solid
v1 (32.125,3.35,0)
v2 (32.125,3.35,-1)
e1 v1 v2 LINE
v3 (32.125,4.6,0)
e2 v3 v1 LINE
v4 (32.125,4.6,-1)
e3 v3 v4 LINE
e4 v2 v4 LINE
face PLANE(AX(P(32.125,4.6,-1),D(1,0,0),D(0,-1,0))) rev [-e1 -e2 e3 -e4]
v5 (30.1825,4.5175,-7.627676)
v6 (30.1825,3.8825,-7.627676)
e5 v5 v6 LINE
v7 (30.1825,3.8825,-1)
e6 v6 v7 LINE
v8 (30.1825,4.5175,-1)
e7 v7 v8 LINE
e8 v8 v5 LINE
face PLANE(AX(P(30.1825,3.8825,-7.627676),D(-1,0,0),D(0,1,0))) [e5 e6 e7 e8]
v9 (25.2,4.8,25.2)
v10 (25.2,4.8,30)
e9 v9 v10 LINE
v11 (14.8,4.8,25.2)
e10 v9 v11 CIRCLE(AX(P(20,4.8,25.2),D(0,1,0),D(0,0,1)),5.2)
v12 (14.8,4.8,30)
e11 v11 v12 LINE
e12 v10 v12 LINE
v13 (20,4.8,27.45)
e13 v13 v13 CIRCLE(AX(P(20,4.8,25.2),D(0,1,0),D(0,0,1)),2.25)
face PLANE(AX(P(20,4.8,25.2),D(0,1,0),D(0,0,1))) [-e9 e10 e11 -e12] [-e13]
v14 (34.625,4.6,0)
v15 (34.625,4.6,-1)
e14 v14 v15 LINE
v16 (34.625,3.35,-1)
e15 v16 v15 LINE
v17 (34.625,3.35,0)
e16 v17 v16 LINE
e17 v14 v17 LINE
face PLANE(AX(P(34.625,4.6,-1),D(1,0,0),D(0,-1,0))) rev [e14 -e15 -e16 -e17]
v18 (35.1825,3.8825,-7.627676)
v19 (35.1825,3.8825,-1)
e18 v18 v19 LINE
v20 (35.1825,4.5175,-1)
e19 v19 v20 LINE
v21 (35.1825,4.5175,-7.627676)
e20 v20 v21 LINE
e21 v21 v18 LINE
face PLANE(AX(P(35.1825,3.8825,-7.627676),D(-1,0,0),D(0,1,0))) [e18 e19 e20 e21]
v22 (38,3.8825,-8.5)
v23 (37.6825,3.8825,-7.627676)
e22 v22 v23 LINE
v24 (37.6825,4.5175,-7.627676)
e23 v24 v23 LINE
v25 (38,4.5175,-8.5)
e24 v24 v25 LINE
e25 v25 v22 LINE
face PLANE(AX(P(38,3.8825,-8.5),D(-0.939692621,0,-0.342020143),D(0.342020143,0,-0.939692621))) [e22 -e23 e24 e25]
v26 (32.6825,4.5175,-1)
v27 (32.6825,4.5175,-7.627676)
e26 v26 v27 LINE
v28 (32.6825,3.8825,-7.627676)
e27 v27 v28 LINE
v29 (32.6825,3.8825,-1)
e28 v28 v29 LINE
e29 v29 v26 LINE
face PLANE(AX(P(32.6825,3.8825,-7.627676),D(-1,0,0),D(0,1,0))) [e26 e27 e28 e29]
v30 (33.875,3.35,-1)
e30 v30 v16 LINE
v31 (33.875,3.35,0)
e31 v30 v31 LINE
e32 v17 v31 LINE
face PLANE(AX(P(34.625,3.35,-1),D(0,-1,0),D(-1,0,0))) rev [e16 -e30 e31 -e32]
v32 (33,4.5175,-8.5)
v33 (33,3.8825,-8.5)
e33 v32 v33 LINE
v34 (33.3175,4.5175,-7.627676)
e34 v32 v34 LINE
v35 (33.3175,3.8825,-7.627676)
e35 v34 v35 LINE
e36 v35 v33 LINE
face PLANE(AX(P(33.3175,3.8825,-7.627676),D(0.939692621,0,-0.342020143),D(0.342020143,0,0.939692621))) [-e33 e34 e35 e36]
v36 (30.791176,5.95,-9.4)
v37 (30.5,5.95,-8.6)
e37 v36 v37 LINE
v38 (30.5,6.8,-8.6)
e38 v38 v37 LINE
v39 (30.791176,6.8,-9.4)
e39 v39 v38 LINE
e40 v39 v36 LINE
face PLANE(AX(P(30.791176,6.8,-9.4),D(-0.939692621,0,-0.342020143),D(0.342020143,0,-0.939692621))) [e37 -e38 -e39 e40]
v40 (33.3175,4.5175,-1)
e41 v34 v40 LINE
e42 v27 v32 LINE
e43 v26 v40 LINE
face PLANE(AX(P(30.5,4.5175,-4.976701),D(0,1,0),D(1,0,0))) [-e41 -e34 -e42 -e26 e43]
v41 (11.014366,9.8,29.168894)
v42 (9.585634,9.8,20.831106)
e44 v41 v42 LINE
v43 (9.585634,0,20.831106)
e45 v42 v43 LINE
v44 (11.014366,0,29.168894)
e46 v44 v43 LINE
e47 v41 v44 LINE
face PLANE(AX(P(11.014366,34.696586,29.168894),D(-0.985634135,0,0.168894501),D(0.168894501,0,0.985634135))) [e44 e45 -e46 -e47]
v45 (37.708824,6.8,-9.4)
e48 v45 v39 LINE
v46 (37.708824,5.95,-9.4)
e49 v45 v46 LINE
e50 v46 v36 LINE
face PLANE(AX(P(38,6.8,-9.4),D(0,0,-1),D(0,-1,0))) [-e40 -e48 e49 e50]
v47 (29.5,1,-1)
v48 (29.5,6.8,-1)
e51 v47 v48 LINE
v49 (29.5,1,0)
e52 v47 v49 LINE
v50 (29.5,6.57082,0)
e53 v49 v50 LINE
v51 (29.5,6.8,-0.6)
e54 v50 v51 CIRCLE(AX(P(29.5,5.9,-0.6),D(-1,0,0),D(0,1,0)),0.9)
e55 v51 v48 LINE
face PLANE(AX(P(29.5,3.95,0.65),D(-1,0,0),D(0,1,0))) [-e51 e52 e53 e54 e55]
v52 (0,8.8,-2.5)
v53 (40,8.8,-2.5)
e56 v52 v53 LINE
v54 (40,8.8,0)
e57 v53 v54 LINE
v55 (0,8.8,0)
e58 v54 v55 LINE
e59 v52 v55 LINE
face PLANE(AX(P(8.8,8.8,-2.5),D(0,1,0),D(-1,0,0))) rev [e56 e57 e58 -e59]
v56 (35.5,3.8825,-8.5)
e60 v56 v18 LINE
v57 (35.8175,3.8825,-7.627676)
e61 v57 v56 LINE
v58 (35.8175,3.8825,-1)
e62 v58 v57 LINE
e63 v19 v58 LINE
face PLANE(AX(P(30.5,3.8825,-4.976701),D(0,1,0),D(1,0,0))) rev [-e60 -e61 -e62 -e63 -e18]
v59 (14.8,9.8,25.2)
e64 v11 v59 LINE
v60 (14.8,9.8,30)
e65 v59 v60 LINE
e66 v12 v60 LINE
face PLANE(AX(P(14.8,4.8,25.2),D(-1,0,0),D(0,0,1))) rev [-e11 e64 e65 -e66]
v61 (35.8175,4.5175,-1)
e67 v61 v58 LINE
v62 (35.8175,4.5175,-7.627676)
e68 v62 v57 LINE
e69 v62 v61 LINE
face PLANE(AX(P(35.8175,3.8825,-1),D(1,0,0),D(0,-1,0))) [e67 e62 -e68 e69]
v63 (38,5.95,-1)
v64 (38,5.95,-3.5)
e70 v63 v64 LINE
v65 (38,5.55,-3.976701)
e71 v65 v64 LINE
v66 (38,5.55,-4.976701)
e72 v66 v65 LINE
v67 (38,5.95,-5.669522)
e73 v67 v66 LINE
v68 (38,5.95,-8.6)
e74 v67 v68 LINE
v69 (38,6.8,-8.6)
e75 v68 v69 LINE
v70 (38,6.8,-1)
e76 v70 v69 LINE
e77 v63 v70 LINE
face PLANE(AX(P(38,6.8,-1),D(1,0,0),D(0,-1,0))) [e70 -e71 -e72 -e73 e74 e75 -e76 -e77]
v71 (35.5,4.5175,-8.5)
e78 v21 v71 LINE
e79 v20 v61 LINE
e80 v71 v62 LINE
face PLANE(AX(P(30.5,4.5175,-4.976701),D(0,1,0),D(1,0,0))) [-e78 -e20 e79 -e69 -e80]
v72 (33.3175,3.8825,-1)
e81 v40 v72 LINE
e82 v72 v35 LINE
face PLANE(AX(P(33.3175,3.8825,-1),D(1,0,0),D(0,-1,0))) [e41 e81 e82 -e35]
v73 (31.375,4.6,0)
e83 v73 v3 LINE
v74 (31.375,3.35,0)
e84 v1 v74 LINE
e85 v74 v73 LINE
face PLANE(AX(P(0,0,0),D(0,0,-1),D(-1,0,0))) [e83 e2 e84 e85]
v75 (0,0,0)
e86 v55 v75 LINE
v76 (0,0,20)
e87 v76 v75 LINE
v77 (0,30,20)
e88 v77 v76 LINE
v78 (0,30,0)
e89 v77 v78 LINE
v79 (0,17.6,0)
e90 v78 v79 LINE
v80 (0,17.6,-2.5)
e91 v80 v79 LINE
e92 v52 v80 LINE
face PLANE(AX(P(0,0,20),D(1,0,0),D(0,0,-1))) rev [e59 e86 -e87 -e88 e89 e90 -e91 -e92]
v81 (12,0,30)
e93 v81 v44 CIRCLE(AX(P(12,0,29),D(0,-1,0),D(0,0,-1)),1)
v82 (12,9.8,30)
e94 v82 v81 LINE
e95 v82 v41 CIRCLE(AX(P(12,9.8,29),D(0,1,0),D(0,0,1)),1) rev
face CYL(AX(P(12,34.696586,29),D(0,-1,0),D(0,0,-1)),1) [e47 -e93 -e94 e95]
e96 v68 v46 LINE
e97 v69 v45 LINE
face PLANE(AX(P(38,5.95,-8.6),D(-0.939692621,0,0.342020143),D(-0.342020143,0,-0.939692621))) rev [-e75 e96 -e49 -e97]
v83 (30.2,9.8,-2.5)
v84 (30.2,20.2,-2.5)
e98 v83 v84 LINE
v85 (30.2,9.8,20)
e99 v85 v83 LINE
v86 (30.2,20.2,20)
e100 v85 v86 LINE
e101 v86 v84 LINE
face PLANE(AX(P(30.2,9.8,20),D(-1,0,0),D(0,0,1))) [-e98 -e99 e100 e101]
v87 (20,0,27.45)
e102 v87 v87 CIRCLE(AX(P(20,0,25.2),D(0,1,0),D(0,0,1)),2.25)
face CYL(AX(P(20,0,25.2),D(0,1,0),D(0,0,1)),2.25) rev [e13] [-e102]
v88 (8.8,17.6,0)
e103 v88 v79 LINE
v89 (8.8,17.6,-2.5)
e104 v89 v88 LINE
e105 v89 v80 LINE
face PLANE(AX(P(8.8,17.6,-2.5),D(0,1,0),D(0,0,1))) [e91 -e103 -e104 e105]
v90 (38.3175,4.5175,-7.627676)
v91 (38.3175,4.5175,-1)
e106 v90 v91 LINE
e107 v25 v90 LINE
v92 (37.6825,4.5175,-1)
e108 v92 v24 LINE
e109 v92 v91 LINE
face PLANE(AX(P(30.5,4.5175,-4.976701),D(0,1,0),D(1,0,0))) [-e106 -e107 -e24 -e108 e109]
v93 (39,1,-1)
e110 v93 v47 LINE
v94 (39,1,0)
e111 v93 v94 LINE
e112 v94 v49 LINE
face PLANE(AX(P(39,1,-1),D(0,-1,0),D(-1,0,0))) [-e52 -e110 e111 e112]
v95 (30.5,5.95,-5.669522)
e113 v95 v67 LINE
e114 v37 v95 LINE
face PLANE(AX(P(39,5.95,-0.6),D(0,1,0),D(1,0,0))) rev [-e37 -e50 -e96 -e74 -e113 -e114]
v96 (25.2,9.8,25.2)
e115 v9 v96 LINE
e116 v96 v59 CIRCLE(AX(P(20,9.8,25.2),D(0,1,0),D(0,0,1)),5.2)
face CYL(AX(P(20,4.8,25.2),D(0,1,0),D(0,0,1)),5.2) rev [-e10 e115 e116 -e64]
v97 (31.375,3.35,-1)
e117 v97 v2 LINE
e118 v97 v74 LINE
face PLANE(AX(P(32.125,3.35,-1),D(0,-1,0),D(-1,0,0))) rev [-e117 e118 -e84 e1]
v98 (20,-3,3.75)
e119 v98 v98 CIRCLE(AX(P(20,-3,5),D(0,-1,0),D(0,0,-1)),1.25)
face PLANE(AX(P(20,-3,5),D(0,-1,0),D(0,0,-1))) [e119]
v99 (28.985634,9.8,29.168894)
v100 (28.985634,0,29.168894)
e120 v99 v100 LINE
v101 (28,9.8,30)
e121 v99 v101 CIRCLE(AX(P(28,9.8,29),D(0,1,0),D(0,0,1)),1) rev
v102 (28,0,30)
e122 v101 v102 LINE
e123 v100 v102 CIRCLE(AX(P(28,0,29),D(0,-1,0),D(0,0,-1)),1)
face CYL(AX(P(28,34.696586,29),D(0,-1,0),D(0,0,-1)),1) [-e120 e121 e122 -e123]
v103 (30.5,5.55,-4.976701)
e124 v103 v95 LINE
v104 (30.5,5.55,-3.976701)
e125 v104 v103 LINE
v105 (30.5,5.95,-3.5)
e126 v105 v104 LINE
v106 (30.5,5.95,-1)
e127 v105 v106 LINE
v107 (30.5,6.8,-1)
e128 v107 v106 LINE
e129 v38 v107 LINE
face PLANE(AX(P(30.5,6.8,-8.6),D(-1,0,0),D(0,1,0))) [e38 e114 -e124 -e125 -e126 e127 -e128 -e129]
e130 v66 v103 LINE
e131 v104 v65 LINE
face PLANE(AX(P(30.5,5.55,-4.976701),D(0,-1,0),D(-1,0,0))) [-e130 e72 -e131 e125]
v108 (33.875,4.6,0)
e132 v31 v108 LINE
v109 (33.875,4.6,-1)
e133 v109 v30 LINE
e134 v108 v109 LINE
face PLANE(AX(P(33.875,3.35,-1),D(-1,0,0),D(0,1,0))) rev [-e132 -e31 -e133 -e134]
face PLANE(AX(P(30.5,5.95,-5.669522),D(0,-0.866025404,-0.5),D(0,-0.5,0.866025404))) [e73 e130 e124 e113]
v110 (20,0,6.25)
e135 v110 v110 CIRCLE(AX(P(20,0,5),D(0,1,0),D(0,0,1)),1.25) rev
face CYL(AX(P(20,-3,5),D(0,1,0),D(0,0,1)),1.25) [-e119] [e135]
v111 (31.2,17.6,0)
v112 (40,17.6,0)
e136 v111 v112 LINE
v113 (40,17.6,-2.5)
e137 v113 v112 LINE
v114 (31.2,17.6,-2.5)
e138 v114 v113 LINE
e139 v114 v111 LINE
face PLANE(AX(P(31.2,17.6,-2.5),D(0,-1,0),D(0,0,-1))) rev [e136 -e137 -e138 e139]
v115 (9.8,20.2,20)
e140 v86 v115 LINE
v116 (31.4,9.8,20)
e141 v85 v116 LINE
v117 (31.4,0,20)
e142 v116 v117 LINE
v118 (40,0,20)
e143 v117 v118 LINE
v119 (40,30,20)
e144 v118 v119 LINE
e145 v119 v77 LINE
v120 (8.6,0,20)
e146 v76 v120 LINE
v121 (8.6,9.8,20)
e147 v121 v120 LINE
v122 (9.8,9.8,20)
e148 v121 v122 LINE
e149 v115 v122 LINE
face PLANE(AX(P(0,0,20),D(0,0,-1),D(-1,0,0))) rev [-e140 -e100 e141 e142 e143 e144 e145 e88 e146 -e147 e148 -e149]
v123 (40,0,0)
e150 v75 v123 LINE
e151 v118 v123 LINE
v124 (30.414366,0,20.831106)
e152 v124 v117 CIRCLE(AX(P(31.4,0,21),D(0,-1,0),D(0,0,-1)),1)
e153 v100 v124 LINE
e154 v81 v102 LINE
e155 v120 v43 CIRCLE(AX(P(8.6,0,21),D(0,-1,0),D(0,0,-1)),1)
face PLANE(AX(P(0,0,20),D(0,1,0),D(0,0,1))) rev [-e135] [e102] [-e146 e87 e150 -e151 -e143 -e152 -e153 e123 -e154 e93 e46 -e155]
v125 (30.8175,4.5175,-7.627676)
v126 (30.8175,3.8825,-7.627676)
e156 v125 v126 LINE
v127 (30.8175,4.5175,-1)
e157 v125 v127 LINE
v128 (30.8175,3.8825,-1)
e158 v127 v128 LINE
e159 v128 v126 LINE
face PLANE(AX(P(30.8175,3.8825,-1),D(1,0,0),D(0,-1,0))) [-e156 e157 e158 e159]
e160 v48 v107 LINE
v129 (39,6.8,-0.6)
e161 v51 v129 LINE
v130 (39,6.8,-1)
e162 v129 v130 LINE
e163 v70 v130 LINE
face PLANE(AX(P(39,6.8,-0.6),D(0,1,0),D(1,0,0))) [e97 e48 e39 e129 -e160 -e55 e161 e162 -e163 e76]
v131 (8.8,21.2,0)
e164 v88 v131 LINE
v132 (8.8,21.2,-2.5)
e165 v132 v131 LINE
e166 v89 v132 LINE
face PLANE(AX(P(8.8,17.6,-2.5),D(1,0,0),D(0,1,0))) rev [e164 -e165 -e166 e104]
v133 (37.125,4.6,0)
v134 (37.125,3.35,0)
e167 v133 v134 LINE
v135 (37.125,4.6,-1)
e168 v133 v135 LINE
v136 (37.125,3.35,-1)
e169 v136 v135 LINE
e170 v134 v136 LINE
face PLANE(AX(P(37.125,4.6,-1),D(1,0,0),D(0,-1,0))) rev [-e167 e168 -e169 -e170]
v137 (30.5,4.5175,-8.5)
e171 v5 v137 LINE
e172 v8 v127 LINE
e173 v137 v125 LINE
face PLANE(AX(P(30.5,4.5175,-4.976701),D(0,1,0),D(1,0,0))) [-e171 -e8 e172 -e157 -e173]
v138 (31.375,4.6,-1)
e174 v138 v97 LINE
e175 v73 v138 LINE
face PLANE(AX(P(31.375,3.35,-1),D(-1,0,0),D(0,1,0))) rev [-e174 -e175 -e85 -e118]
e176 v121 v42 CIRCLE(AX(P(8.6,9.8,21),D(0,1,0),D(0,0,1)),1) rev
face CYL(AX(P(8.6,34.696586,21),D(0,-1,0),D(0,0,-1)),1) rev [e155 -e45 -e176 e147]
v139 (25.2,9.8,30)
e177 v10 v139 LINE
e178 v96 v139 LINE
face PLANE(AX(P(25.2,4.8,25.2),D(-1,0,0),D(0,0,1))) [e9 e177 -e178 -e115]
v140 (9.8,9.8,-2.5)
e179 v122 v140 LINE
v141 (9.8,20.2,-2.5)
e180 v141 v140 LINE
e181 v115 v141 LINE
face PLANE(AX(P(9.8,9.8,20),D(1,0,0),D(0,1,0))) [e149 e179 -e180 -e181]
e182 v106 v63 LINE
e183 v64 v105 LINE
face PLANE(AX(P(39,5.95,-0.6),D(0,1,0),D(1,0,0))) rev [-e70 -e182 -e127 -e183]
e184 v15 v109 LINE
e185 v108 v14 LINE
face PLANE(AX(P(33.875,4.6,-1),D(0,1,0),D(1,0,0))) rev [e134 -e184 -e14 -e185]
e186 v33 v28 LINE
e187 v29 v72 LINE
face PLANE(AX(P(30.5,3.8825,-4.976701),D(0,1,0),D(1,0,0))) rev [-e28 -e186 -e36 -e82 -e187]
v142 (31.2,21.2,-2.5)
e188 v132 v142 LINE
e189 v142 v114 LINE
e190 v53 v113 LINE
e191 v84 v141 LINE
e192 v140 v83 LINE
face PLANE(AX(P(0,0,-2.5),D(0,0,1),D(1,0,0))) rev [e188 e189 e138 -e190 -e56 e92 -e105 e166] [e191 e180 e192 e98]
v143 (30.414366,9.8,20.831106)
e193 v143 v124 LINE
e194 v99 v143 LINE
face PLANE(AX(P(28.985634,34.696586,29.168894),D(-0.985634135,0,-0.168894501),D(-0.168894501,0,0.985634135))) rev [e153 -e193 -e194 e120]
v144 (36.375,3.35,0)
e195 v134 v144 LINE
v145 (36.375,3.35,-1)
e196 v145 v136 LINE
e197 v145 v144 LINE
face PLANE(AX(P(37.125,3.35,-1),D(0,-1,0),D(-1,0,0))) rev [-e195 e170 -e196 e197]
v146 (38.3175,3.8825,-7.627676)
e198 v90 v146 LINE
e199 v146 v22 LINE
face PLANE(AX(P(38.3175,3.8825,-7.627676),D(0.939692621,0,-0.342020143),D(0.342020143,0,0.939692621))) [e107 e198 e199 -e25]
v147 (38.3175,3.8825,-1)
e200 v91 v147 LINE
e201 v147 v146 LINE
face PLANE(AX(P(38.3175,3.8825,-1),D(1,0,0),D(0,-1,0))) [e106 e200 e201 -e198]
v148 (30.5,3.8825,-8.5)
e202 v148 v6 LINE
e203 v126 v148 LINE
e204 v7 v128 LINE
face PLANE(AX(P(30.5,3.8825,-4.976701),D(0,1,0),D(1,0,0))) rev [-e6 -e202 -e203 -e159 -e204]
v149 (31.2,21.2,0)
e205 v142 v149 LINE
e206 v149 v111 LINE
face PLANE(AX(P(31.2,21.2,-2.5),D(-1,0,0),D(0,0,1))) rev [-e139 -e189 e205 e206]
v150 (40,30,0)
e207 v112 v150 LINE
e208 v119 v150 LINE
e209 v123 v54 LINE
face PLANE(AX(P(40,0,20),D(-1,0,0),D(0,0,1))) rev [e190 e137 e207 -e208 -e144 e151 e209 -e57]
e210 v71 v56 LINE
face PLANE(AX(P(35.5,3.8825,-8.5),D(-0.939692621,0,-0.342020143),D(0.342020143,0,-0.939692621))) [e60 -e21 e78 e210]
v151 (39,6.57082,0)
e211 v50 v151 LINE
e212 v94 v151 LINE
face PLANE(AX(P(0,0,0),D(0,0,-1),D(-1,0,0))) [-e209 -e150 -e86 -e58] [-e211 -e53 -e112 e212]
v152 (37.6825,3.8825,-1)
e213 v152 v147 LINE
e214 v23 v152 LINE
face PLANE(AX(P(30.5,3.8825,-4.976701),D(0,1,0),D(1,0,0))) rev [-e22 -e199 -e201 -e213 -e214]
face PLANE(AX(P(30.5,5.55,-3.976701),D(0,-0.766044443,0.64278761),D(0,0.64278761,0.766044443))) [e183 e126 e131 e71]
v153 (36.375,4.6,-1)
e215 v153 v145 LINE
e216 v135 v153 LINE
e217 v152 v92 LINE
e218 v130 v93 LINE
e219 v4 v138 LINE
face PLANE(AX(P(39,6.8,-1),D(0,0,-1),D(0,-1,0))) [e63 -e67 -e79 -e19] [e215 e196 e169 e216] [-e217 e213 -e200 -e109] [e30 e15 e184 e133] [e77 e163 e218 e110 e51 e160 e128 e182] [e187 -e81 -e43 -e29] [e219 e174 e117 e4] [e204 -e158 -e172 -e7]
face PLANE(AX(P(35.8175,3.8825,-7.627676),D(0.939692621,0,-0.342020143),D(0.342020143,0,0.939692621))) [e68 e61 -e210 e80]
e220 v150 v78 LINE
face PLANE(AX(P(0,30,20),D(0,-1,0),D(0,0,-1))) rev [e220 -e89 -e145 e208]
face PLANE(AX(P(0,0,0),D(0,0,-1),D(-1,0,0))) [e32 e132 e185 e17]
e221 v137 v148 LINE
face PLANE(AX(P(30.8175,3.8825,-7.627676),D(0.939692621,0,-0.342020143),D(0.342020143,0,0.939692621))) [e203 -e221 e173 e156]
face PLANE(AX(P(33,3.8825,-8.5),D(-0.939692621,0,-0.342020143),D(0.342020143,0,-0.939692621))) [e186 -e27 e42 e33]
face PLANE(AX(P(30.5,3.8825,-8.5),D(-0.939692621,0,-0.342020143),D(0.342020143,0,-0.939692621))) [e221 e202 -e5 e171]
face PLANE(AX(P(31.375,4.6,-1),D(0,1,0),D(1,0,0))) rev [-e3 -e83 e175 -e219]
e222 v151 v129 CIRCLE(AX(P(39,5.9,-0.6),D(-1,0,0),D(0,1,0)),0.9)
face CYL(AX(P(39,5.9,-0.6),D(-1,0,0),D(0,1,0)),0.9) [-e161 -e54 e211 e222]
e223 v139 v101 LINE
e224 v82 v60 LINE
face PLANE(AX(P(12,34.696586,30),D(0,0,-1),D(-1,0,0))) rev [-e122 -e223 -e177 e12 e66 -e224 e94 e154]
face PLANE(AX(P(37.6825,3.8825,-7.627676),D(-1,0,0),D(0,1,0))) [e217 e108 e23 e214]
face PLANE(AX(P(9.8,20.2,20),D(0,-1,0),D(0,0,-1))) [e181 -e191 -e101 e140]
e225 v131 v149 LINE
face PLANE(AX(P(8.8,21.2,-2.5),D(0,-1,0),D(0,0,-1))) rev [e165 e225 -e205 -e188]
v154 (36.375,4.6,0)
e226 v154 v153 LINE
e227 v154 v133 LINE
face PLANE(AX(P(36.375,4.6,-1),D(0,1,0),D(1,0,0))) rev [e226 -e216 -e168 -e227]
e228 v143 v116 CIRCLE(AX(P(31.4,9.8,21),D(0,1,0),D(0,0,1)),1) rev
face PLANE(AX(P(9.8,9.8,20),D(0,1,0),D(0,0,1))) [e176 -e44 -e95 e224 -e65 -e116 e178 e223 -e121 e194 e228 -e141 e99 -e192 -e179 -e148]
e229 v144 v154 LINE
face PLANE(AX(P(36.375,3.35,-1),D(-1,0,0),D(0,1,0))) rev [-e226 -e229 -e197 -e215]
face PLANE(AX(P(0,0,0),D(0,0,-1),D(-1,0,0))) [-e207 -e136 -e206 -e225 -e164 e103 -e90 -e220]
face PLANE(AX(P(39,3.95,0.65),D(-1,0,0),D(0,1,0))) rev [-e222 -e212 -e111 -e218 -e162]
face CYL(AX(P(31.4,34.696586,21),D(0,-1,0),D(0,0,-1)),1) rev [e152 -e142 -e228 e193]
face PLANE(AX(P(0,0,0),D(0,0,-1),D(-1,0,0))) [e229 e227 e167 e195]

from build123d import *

# Parameters (mm, degrees)
SKETCH1_W                   = 40
SKETCH1_H                   = 30
SKETCH1_W_2                 = 20.4
SKETCH1_H_2                 = 10.4
BOSS_EXTRUDE1_DEPTH         = 20
BOSS_EXTRUDE2_DEPTH         = 9.8
CUT_EXTRUDE1_DEPTH          = 5
SKETCH4_R                   = 2.25
CUT_EXTRUDE2_DEPTH          = 56.991427915
SKETCH5_W                   = 8.8
SKETCH5_H                   = 8.8
SKETCH5_W_2                 = 20.4
SKETCH5_H_2                 = 10.4
BOSS_EXTRUDE3_DEPTH         = 2.5
SKETCH7_R                   = 1.25
BOSS_EXTRUDE4_DEPTH         = 3
BODY_MOVE_COPY6_START       = 1
BODY_MOVE_COPY6_DEPTH       = 4.9
BODY_MOVE_COPY6_START_2     = 5.95
BODY_MOVE_COPY6_2_DEPTH     = 0.85
BODY_MOVE_COPY6_START_3     = 3.8825
BODY_MOVE_COPY6_3_DEPTH     = 0.635
BODY_MOVE_COPY6_4_OUTLINE_W = 0.75
BODY_MOVE_COPY6_4_OUTLINE_H = 1
BODY_MOVE_COPY6_4_DEPTH     = 2.35
BODY_MOVE_COPY6_START_4     = 4.6
BODY_MOVE_COPY6_5_OUTLINE_W = 0.75
BODY_MOVE_COPY6_5_OUTLINE_H = 1
BODY_MOVE_COPY6_5_DEPTH     = 1.35
BODY_MOVE_COPY6_START_5     = 30.5
BODY_MOVE_COPY6_6_DEPTH     = 7.5
BODY_MOVE_COPY6_START_6     = 29.5
BODY_MOVE_COPY6_7_DEPTH     = 9.5


with BuildPart() as part:
    # Sketch1 → Boss-Extrude1 (new body)
    with BuildSketch(Plane.XY):
        with Locations((20, 15)):
            Rectangle(SKETCH1_W, SKETCH1_H)
        with Locations((20, 15)):
            Rectangle(SKETCH1_W_2, SKETCH1_H_2, mode=Mode.SUBTRACT)
    extrude(amount=BOSS_EXTRUDE1_DEPTH)

    # Sketch2 → Boss-Extrude2 (add)
    with BuildSketch(Plane.XZ):
        with BuildLine():
            Line((8.6, 20), (31.4, 20))
            ThreePointArc((31.4, 20), (30.755366169, 20.23550851), (30.414365834, 20.831105526))
            Line((30.414365834, 20.831105526), (28.985634166, 29.168894474))
            ThreePointArc((28.985634166, 29.168894474), (28.644633831, 29.76449149), (28, 30))
            Line((28, 30), (12, 30))
            ThreePointArc((12, 30), (11.355366169, 29.76449149), (11.014365834, 29.168894474))
            Line((11.014365834, 29.168894474), (9.585634166, 20.831105526))
            ThreePointArc((9.585634166, 20.831105526), (9.244633831, 20.23550851), (8.6, 20))
        make_face()
    extrude(amount=-BOSS_EXTRUDE2_DEPTH)

    # Sketch3 → Cut-Extrude1 (cut)
    with BuildSketch(Plane(origin=(0, 9.8, 0), x_dir=(1, 0, 0), z_dir=(0, 1, 0))):
        with BuildLine():
            Line((25.2, -25.2), (25.2, -30))
            Line((25.2, -30), (14.8, -30))
            Line((14.8, -30), (14.8, -25.2))
            ThreePointArc((14.8, -25.2), (20, -20), (25.2, -25.2))
        make_face()
    extrude(amount=-CUT_EXTRUDE1_DEPTH, mode=Mode.SUBTRACT)

    # Sketch4 → Cut-Extrude2 (cut, through all)
    with BuildSketch(Plane(origin=(0, 4.8, 0), x_dir=(1, 0, 0), z_dir=(0, 1, 0))):
        with Locations(Location((20, -25.2, 0), (0, 0, 270))):
            Circle(SKETCH4_R)
    extrude(amount=-CUT_EXTRUDE2_DEPTH, mode=Mode.SUBTRACT)

    # Sketch5 → Boss-Extrude3 (add)
    # profile 1 of 3: a face of its own
    with BuildSketch(Plane(origin=(0, 0, 0), x_dir=(-1, 0, 0), z_dir=(0, 0, -1))):
        with Locations((-4.4, 13.2)):
            Rectangle(SKETCH5_W, SKETCH5_H)
    # profile 2 of 3: a face of its own
    with BuildSketch(Plane(origin=(0, 0, 0), x_dir=(-1, 0, 0), z_dir=(0, 0, -1))):
        Polygon((-31.2, 8.8), (-8.8, 8.8), (-8.8, 17.6), (-8.8, 21.2), (-31.2, 21.2), (-31.2, 17.6), align=None)
        with Locations((-20, 15)):
            Rectangle(SKETCH5_W_2, SKETCH5_H_2, mode=Mode.SUBTRACT)
    # profile 3 of 3: a face of its own
    with BuildSketch(Plane(origin=(0, 0, 0), x_dir=(-1, 0, 0), z_dir=(0, 0, -1))):
        with Locations((-35.6, 13.2)):
            Rectangle(SKETCH5_W, SKETCH5_H)
    extrude(amount=BOSS_EXTRUDE3_DEPTH)

    # Sketch7 → Boss-Extrude4 (add)
    with BuildSketch(Plane.XZ):
        with Locations(Location((20, 5, 0), (0, 0, 90))):
            Circle(SKETCH7_R)
    extrude(amount=BOSS_EXTRUDE4_DEPTH)


with BuildPart() as body_2:
    # Body-Move/Copy6: read off the stored shape, not the designer's step
    # Body-Move/Copy6 outline → Body-Move/Copy6 (new body)
    with BuildSketch(Plane(origin=(0, 0, 0), x_dir=(1, 0, 0), z_dir=(0, 1, 0)).offset(BODY_MOVE_COPY6_START)):
        Polygon((34.75, -1.3), (36.25, -1.3), (36.25, -2.3), (37.25, -2.3), (37.25, -1.3), (38.75, -1.3), (38.75, -2.3), (39, -2.3), (39, 1), (37.125, 1), (37.125, 0), (36.375, 0), (36.375, 1), (34.625, 1), (34.625, 0), (33.875, 0), (33.875, 1), (32.125, 1), (32.125, 0), (31.375, 0), (31.375, 1), (29.5, 1), (29.5, -2.3), (29.75, -2.3), (29.75, -1.3), (31.25, -1.3), (31.25, -2.3), (32.25, -2.3), (32.25, -1.3), (33.75, -1.3), (33.75, -2.3), (34.75, -2.3), align=None)
    extrude(amount=BODY_MOVE_COPY6_DEPTH)

    # Body-Move_Copy6 2 outline → Body-Move_Copy6 2 (add)
    with BuildSketch(Plane(origin=(0, 0, 0), x_dir=(1, 0, 0), z_dir=(0, 1, 0)).offset(BODY_MOVE_COPY6_START_2)):
        Polygon((38, 1), (38, 8.6), (37.708823813, 9.4), (30.791176187, 9.4), (30.5, 8.6), (30.5, 1), align=None)
    extrude(amount=BODY_MOVE_COPY6_2_DEPTH)

    # Body-Move_Copy6 3 outline → Body-Move_Copy6 3 (add)
    with BuildSketch(Plane(origin=(0, 0, 0), x_dir=(1, 0, 0), z_dir=(0, 1, 0)).offset(BODY_MOVE_COPY6_START_3)):
        Polygon((35.1825, -4.827675919), (35.5, -5.7), (35.8175, -4.827675919), (35.8175, -1.3), (35.1825, -1.3), align=None)
        Polygon((38.3175, -1.3), (37.6825, -1.3), (37.6825, -4.827675919), (38, -5.7), (38.3175, -4.827675919), align=None)
        Polygon((33.3175, -4.827675919), (33.3175, -1.3), (32.6825, -1.3), (32.6825, -4.827675919), (33, -5.7), align=None)
        Polygon((38.3175, 1), (38.3175, 7.627675919), (38, 8.5), (37.6825, 7.627675919), (37.6825, 1), align=None)
        Polygon((30.8175, -4.827675919), (30.8175, -1.3), (30.1825, -1.3), (30.1825, -4.827675919), (30.5, -5.7), align=None)
        Polygon((35.1825, 1), (35.8175, 1), (35.8175, 7.627675919), (35.5, 8.5), (35.1825, 7.627675919), align=None)
        Polygon((30.1825, 7.627675919), (30.1825, 1), (30.8175, 1), (30.8175, 7.627675919), (30.5, 8.5), align=None)
        Polygon((32.6825, 1), (33.3175, 1), (33.3175, 7.627675919), (33, 8.5), (32.6825, 7.627675919), align=None)
    extrude(amount=BODY_MOVE_COPY6_3_DEPTH)

    # Body-Move_Copy6 4 outline → Body-Move_Copy6 4 (add)
    with BuildSketch(Plane(origin=(0, 0, 0), x_dir=(1, 0, 0), z_dir=(0, 1, 0)).offset(BODY_MOVE_COPY6_START)):
        with Locations((36.75, 0.5)):
            Rectangle(BODY_MOVE_COPY6_4_OUTLINE_W, BODY_MOVE_COPY6_4_OUTLINE_H)
        with Locations((34.25, 0.5)):
            Rectangle(BODY_MOVE_COPY6_4_OUTLINE_W, BODY_MOVE_COPY6_4_OUTLINE_H)
        with Locations((31.75, 0.5)):
            Rectangle(BODY_MOVE_COPY6_4_OUTLINE_W, BODY_MOVE_COPY6_4_OUTLINE_H)
    extrude(amount=BODY_MOVE_COPY6_4_DEPTH)

    # Body-Move_Copy6 5 outline → Body-Move_Copy6 5 (add)
    with BuildSketch(Plane(origin=(0, 0, 0), x_dir=(1, 0, 0), z_dir=(0, 1, 0)).offset(BODY_MOVE_COPY6_START_4)):
        with Locations((36.75, 0.5)):
            Rectangle(BODY_MOVE_COPY6_5_OUTLINE_W, BODY_MOVE_COPY6_5_OUTLINE_H)
        with Locations((34.25, 0.5)):
            Rectangle(BODY_MOVE_COPY6_5_OUTLINE_W, BODY_MOVE_COPY6_5_OUTLINE_H)
        with Locations((31.75, 0.5)):
            Rectangle(BODY_MOVE_COPY6_5_OUTLINE_W, BODY_MOVE_COPY6_5_OUTLINE_H)
    extrude(amount=BODY_MOVE_COPY6_5_DEPTH)

    # Body-Move_Copy6 6 outline → Body-Move_Copy6 6 (add)
    with BuildSketch(Plane.YZ.offset(BODY_MOVE_COPY6_START_5)):
        Polygon((5.95, -3.5), (5.55, -3.976701437), (5.55, -4.976701437), (5.95, -5.66952176), align=None)
        with BuildLine():
            Line((5.9, -1), (6.8, -1))
            Line((6.8, -1), (6.8, -0.6))
            ThreePointArc((6.8, -0.6), (6.536396103, 0.036396103), (5.9, 0.3))
            Line((5.9, 0.3), (5.9, -1))
        make_face()
    extrude(amount=BODY_MOVE_COPY6_6_DEPTH)

    # Body-Move_Copy6 7 outline → Body-Move_Copy6 7 (add)
    with BuildSketch(Plane.YZ.offset(BODY_MOVE_COPY6_START_6)):
        with BuildLine():
            Line((5.9, -1), (6.8, -1))
            Line((6.8, -1), (6.8, -0.6))
            ThreePointArc((6.8, -0.6), (6.536396103, 0.036396103), (5.9, 0.3))
            Line((5.9, 0.3), (5.9, -1))
        make_face()
    extrude(amount=BODY_MOVE_COPY6_7_DEPTH)


with BuildPart() as part_1:
    add(part.part)

    # Intersect3: read off the stored shape, not the designer's step
    # Intersect3: union body 2
    add(body_2.part)


solid = part_1.part
